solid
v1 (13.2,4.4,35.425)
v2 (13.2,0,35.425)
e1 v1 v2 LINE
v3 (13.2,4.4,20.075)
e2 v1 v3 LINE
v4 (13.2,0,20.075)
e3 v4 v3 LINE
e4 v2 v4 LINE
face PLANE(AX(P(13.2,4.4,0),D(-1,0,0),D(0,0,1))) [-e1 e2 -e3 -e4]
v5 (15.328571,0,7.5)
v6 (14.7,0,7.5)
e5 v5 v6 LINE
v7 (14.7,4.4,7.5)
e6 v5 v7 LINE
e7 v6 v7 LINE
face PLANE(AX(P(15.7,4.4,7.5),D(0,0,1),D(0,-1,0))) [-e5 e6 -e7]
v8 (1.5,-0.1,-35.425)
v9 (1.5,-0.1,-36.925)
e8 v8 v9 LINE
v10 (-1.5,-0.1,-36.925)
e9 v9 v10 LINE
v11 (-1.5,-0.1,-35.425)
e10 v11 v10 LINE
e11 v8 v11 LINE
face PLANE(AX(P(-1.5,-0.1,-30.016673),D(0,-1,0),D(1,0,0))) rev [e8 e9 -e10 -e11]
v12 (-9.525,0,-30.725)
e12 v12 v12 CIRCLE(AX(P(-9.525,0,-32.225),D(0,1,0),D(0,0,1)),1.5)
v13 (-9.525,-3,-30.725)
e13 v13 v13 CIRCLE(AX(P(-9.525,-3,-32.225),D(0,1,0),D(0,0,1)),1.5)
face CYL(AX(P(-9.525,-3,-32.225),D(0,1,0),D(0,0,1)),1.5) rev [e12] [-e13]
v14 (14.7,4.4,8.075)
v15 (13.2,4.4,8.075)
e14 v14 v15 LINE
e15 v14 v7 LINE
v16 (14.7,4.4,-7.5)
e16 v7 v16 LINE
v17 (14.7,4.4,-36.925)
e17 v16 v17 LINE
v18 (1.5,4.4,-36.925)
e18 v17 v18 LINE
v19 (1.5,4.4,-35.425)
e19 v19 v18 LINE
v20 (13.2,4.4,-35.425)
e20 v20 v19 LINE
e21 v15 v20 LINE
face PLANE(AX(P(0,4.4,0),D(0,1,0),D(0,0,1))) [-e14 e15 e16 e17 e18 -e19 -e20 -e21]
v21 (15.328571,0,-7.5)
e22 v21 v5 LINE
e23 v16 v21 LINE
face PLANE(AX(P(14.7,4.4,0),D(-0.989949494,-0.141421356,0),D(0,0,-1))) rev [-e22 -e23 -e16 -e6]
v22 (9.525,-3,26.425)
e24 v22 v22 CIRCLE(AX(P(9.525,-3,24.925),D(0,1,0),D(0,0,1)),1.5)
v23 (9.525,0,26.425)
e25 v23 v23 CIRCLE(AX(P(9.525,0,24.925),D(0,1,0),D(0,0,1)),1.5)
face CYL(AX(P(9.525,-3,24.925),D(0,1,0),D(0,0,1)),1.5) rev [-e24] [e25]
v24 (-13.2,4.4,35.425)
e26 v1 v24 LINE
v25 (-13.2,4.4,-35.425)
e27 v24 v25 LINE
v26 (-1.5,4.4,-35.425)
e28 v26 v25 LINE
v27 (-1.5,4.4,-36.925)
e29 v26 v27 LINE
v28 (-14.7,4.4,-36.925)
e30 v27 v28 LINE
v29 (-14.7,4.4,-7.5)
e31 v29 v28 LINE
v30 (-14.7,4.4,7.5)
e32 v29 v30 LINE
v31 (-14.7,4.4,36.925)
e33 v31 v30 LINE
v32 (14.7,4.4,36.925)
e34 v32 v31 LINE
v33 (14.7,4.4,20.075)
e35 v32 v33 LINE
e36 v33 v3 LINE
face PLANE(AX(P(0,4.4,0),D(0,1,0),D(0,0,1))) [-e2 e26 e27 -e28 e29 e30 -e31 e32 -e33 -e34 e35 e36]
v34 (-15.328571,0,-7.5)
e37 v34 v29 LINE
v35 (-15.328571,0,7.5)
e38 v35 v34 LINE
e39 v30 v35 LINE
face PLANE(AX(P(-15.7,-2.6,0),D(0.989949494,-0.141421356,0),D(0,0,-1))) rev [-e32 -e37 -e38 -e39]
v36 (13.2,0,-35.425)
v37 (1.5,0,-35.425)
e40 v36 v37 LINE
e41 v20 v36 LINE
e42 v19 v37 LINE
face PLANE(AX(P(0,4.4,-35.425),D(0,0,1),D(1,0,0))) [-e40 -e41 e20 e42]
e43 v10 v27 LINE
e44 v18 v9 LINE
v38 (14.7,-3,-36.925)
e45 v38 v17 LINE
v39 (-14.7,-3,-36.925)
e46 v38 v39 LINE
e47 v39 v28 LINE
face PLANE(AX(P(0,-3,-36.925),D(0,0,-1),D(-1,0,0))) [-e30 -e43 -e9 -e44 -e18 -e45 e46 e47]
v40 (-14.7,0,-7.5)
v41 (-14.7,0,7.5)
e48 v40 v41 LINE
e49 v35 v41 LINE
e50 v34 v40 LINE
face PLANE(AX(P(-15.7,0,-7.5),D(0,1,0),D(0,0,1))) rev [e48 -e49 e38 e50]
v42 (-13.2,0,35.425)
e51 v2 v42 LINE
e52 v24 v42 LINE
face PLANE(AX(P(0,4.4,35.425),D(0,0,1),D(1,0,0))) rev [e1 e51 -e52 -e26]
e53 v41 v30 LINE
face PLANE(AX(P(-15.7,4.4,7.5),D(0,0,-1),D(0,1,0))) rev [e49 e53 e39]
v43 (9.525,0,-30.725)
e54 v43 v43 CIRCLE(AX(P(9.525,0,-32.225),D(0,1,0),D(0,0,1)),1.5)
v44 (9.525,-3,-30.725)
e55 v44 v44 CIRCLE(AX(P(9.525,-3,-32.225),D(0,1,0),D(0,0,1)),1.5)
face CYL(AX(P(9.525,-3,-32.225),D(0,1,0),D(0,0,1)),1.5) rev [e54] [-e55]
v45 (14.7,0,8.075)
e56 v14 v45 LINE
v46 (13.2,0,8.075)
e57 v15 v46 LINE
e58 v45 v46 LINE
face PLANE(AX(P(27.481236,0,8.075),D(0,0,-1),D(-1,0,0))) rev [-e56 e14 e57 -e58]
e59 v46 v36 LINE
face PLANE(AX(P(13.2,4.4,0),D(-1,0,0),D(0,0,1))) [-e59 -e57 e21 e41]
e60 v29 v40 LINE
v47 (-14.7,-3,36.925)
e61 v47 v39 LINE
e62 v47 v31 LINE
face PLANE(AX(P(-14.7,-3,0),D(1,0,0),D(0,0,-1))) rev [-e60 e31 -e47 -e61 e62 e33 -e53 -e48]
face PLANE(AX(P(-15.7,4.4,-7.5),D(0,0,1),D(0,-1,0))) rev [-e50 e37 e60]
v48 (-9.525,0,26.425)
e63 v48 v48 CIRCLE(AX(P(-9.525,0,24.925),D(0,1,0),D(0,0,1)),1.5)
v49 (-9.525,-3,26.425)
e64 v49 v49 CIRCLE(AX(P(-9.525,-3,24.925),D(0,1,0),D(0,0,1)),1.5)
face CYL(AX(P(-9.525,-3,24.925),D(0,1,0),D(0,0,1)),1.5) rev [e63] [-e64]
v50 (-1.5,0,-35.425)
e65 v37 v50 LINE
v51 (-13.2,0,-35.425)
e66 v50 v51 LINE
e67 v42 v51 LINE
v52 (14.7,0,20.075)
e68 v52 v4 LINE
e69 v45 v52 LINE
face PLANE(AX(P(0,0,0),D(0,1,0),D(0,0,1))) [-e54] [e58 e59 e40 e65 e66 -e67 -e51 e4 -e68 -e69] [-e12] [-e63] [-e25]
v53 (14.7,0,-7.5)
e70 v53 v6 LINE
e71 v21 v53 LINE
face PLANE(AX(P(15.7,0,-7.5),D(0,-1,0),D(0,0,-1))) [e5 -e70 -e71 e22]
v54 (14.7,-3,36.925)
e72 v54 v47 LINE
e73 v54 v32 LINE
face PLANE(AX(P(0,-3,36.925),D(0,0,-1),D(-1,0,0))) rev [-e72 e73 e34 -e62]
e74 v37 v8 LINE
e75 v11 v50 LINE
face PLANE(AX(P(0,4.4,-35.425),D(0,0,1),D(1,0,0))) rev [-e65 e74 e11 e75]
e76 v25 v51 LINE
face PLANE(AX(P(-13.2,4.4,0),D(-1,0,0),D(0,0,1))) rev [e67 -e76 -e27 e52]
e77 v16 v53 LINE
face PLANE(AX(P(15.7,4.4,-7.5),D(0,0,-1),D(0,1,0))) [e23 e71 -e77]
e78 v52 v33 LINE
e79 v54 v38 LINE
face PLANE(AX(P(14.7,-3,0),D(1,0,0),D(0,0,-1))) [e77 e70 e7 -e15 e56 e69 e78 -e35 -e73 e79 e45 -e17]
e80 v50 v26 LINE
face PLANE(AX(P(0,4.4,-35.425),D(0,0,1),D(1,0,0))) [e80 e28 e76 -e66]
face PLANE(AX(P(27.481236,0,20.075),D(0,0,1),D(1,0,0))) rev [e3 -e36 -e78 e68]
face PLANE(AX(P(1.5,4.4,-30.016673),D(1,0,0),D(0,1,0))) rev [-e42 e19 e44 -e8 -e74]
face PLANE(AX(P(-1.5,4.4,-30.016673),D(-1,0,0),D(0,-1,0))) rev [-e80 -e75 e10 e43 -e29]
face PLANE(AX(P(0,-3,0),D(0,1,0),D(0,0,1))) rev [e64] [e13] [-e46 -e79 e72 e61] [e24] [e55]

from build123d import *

# Parameters (mm, degrees)
SKETCH1_W               = 29.4
SKETCH1_H               = 73.85
SKETCH1_W_2             = 26.4
SKETCH1_H_2             = 70.85
SKETCH1_W_3             = 25.4
SKETCH1_H_3             = 69.85
BOSS_EXTRUDE1_DEPTH     = 3
SKETCH1_3_W             = 29.4
SKETCH1_3_H             = 73.85
SKETCH1_3_W_2           = 26.4
SKETCH1_3_H_2           = 70.85
BOSS_EXTRUDE2_DEPTH     = 4.4
CUT_EXTRUDE1_DEPTH      = 40.986317973
CUT_EXTRUDE1_DEPTH_BACK = 40.986317973
SKETCH2_R               = 1.5
SKETCH3_W               = 3
SKETCH3_H               = 4.5
CUT_EXTRUDE2_DEPTH      = 1.5
SKETCH4_W               = 12
SKETCH4_H               = 4.4
CUT_EXTRUDE3_DEPTH      = 1.5
SKETCH5_W               = 15
SKETCH5_H               = 4.4
BOSS_EXTRUDE3_DEPTH     = 1
CHAMFER1_SIZE           = 1
CHAMFER1_SIZE_2         = 7
CHAMFER2_SIZE           = 1
CHAMFER2_SIZE_2         = 7


with BuildPart() as part:
    # Sketch1 → Boss-Extrude1 (new body)
    # profile 1 of 3: a face of its own
    with BuildSketch(Plane(origin=(0, 0, 0), x_dir=(1, 0, 0), z_dir=(0, 1, 0))):
        Rectangle(SKETCH1_W, SKETCH1_H)
        Rectangle(SKETCH1_W_2, SKETCH1_H_2, mode=Mode.SUBTRACT)
    # profile 2 of 3: a face of its own
    with BuildSketch(Plane(origin=(0, 0, 0), x_dir=(1, 0, 0), z_dir=(0, 1, 0))):
        Rectangle(SKETCH1_W_2, SKETCH1_H_2)
        Rectangle(SKETCH1_W_3, SKETCH1_H_3, mode=Mode.SUBTRACT)
    # profile 3 of 3: a face of its own
    with BuildSketch(Plane(origin=(0, 0, 0), x_dir=(1, 0, 0), z_dir=(0, 1, 0))):
        Rectangle(SKETCH1_W_3, SKETCH1_H_3)
    extrude(amount=-BOSS_EXTRUDE1_DEPTH)

    # Sketch1<3> → Boss-Extrude2 (add)
    with BuildSketch(Plane(origin=(0, 0, 0), x_dir=(1, 0, 0), z_dir=(0, 1, 0))):
        Rectangle(SKETCH1_3_W, SKETCH1_3_H)
        Rectangle(SKETCH1_3_W_2, SKETCH1_3_H_2, mode=Mode.SUBTRACT)
    extrude(amount=BOSS_EXTRUDE2_DEPTH)

    # Sketch2 → Cut-Extrude1 (cut, two sides: drawn at the far end of the back side and taken through both)
    with BuildSketch(Plane(origin=(0, 0, 0), x_dir=(1, 0, 0), z_dir=(0, 1, 0)).offset(-CUT_EXTRUDE1_DEPTH_BACK)):
        with BuildLine():
            ThreePointArc((11.025, 32.225), (9.525, 33.725), (8.025, 32.225))
            Line((8.025, 32.225), (9.525, 32.225))
            Line((9.525, 32.225), (9.525, 30.725))
            ThreePointArc((9.525, 30.725), (10.585660172, 31.164339828), (11.025, 32.225))
        make_face()
        with BuildLine():
            Line((9.525, 32.225), (8.025, 32.225))
            ThreePointArc((8.025, 32.225), (8.464339828, 31.164339828), (9.525, 30.725))
            Line((9.525, 30.725), (9.525, 32.225))
        make_face()
        with Locations(Location((-9.525, 32.225, 0), (0, 0, 270))):
            Circle(SKETCH2_R)
        with Locations(Location((-9.525, -24.925, 0), (0, 0, 270))):
            Circle(SKETCH2_R)
        with Locations(Location((9.525, -24.925, 0), (0, 0, 270))):
            Circle(SKETCH2_R)
    extrude(amount=CUT_EXTRUDE1_DEPTH + CUT_EXTRUDE1_DEPTH_BACK, mode=Mode.SUBTRACT)

    # Sketch3 → Cut-Extrude2 (cut)
    with BuildSketch(Plane(origin=(0, 0, -36.925), x_dir=(-1, 0, 0), z_dir=(0, 0, -1))):
        with Locations((0, 2.15)):
            Rectangle(SKETCH3_W, SKETCH3_H)
    extrude(amount=-CUT_EXTRUDE2_DEPTH, mode=Mode.SUBTRACT)

    # Sketch4 → Cut-Extrude3 (cut)
    with BuildSketch(Plane.ZY.offset(-13.2)):
        with Locations((14.075, 2.2)):
            Rectangle(SKETCH4_W, SKETCH4_H)
    extrude(amount=-CUT_EXTRUDE3_DEPTH, mode=Mode.SUBTRACT)

    # Sketch5 → Boss-Extrude3 (add)
    with BuildSketch(Plane.ZY.offset(14.7)):
        with Locations((0, 2.2)):
            Rectangle(SKETCH5_W, SKETCH5_H)
    boss_extrude3 = extrude(amount=BOSS_EXTRUDE3_DEPTH)

    # Chamfer1
    # the kernel refuses this chamfer: 7, 1 mm, written as the material it takes off along each edge
    with BuildSketch(Plane(origin=(-15.7, 4.4, -25.693233978), x_dir=(0.9662442572155542, 0.2576277069687226, 0), z_dir=(0, 0, 1))) as chamfer1_piece_1:
        Polygon((CHAMFER1_SIZE * 0.966244257216, -CHAMFER1_SIZE * 0.257627706969), (-CHAMFER1_SIZE_2 * 0.257627706969, -CHAMFER1_SIZE_2 * 0.966244257216), (0, 0), align=None)
    extrude(amount=51.386467957, mode=Mode.SUBTRACT)

    # Mirror1: Boss-Extrude3 across plane
    add(boss_extrude3.mirror(Plane(origin=(0, 0, 0), x_dir=(0, 0, 1), z_dir=(1, 0, 0))))

    # Chamfer2
    # the kernel refuses this chamfer: 7, 1 mm, written as the material it takes off along each edge
    with BuildSketch(Plane(origin=(15.7, 4.4, -25.693233978), x_dir=(-0.9662442572155542, 0.2576277069687226, 0), z_dir=(0, 0, 1))) as chamfer2_piece_1:
        Polygon((CHAMFER2_SIZE * 0.966244257216, CHAMFER2_SIZE * 0.257627706969), (-CHAMFER2_SIZE_2 * 0.257627706969, CHAMFER2_SIZE_2 * 0.966244257216), (0, 0), align=None)
    extrude(amount=51.386467957, mode=Mode.SUBTRACT)


solid = part.part
